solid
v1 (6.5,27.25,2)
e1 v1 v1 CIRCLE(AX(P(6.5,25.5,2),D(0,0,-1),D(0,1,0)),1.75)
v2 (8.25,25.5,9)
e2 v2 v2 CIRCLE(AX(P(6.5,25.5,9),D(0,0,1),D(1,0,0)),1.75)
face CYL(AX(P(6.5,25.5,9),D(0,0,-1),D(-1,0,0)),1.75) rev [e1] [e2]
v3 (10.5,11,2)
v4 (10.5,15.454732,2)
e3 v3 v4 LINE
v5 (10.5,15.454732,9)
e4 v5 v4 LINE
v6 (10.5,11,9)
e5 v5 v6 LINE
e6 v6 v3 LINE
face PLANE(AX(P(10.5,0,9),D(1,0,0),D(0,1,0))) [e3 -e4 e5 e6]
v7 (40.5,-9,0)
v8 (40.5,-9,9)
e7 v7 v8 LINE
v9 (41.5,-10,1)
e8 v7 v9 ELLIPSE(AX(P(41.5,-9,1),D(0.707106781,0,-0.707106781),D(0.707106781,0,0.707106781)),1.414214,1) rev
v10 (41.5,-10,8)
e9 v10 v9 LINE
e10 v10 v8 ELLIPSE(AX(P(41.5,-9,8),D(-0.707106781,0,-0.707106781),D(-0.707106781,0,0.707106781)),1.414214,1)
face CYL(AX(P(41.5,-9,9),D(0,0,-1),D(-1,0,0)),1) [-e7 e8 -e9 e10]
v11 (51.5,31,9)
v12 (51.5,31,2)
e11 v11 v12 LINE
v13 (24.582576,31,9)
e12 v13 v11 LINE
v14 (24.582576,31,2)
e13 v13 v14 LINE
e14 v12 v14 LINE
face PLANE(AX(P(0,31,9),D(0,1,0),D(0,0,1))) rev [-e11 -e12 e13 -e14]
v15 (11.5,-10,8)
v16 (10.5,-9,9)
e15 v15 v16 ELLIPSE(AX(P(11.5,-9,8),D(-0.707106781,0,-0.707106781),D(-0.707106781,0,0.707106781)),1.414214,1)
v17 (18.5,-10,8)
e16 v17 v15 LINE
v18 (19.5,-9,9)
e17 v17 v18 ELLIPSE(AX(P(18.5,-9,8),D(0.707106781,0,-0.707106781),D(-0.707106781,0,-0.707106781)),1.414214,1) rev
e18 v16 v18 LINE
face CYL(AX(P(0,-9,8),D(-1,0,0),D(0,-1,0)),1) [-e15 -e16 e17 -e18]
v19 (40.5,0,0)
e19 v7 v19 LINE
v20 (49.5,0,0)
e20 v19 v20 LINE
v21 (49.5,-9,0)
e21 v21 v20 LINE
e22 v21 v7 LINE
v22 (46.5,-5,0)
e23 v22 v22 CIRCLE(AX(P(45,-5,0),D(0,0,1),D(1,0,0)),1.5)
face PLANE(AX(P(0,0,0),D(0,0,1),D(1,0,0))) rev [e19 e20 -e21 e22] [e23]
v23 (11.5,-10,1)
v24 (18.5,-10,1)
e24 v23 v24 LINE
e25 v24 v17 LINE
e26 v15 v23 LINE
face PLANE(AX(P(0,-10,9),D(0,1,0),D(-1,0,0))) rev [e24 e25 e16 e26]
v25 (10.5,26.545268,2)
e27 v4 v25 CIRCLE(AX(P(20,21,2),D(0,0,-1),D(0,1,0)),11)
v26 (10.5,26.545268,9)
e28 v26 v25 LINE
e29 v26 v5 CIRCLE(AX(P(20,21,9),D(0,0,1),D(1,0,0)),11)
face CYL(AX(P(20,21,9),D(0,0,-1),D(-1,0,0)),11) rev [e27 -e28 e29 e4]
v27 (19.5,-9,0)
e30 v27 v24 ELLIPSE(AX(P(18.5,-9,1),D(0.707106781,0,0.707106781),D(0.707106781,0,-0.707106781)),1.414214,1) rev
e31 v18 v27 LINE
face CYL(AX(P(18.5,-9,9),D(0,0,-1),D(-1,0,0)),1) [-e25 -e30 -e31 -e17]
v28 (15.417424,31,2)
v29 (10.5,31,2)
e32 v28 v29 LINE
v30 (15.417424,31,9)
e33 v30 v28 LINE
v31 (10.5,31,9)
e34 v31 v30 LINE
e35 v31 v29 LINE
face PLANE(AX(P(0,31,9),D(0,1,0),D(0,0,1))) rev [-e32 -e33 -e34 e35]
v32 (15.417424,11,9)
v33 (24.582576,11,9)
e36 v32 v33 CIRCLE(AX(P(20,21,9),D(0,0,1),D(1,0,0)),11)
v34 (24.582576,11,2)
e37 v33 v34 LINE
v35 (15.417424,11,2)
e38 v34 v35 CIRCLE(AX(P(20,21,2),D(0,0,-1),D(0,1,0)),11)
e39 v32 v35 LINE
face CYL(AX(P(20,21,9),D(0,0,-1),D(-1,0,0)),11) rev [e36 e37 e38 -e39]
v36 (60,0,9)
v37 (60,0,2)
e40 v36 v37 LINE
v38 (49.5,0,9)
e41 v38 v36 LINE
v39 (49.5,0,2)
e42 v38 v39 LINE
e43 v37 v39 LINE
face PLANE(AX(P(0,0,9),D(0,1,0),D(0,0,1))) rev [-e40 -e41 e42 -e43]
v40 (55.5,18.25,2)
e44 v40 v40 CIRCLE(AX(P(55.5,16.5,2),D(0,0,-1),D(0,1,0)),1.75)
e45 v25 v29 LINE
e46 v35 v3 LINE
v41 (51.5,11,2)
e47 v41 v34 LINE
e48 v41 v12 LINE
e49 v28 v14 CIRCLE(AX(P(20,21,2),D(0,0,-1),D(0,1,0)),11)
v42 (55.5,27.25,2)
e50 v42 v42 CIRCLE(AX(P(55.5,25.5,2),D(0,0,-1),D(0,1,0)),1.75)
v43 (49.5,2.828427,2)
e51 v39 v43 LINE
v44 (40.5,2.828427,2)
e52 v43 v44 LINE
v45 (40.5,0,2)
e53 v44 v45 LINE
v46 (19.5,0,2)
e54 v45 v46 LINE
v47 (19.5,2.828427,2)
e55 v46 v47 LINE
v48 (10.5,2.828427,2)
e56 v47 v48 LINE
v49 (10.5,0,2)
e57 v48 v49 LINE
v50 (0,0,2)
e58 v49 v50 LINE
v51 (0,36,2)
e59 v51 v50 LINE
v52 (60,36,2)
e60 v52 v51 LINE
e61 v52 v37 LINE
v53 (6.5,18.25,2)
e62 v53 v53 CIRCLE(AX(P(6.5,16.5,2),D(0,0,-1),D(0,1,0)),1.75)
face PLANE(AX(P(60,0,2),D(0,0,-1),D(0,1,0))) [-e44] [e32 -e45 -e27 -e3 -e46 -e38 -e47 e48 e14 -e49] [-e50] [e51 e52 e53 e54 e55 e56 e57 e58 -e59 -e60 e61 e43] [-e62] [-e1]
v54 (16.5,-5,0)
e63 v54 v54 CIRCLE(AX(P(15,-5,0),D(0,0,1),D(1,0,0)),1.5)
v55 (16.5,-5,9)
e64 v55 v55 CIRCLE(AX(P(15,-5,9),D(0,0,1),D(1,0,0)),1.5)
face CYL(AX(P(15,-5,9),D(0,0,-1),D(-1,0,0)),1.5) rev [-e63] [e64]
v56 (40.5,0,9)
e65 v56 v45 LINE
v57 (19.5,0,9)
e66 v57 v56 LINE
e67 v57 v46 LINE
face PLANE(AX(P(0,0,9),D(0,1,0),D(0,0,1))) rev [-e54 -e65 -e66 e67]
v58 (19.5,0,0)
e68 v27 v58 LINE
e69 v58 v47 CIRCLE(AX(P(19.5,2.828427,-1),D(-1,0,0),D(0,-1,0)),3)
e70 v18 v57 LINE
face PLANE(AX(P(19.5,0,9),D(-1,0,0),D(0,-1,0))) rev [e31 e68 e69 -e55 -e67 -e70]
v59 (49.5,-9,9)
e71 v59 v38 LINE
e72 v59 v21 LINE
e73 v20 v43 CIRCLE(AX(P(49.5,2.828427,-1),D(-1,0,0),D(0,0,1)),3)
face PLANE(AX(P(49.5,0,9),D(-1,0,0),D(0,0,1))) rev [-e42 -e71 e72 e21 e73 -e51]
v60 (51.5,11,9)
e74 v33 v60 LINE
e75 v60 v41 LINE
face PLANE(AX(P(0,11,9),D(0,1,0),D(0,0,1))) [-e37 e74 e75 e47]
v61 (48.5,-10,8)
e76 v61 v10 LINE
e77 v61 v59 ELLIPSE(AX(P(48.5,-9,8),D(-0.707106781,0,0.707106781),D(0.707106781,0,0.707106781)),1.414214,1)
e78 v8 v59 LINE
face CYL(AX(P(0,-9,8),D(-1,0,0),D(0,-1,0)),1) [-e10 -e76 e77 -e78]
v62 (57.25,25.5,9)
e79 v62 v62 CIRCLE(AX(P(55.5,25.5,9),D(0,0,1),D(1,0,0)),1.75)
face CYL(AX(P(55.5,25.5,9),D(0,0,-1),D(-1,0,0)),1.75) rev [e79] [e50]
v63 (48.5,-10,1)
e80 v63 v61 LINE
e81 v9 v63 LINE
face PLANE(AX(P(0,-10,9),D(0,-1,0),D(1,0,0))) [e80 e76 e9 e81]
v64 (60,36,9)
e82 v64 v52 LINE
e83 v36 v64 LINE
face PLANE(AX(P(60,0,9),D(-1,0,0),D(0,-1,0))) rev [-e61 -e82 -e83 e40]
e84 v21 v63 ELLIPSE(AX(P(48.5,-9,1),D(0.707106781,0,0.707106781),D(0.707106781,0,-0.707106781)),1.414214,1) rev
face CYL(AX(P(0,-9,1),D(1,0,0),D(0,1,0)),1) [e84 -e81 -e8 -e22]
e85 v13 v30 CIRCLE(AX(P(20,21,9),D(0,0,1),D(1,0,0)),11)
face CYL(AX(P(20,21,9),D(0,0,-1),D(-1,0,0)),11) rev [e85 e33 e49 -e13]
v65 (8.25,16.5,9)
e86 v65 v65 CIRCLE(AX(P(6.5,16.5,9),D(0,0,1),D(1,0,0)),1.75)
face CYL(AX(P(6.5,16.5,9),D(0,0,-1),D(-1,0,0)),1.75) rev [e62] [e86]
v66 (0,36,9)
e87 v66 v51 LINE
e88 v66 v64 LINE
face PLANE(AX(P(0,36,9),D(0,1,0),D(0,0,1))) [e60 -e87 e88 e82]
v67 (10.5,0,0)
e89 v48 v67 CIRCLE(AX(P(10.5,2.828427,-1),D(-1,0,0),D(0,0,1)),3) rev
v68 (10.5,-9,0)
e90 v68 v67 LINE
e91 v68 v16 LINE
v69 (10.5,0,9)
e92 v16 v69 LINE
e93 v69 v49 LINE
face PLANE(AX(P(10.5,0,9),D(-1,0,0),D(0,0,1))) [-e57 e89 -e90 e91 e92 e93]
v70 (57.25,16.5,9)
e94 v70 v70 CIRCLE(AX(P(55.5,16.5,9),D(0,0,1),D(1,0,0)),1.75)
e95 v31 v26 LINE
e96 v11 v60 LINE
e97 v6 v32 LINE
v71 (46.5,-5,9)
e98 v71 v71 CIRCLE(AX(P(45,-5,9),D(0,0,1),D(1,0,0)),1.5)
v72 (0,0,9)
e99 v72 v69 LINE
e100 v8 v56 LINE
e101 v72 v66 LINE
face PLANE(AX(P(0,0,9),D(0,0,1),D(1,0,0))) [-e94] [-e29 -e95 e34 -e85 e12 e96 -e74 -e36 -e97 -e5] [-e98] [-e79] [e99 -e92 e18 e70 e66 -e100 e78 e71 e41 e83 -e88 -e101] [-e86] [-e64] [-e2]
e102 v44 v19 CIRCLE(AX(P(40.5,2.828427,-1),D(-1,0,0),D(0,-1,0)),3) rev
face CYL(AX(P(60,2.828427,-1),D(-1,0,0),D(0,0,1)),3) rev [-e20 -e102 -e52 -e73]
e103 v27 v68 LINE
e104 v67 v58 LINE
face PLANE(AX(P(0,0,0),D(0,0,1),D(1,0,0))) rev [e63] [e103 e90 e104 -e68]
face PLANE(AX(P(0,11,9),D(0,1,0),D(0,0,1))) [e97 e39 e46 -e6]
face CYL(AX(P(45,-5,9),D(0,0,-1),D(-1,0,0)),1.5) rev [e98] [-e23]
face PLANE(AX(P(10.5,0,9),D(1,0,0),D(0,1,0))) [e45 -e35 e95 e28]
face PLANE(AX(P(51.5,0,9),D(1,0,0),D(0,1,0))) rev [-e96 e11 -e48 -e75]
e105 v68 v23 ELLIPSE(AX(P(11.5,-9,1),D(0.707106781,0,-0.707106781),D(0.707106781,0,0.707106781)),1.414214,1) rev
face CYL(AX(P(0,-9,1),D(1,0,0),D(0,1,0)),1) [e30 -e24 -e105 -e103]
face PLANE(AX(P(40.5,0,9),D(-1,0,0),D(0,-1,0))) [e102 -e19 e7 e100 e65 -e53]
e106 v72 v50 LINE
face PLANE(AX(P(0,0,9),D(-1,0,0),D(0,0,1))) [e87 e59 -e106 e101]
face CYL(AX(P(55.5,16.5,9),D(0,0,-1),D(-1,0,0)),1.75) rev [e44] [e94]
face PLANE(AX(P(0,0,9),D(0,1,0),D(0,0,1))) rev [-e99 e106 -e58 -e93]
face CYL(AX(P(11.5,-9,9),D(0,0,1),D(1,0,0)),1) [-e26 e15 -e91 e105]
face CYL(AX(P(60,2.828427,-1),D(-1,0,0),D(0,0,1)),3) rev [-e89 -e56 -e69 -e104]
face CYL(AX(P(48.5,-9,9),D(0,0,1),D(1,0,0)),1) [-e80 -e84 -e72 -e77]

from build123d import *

# Parameters (mm, degrees)
CROQUIS1_R              = 1.75
CROQUIS1_R_2            = 1.5
SALIENTE_EXTRUIR1_DEPTH = 9
REDONDEO1_R             = 1
CROQUIS2_W              = 2
CROQUIS2_H              = 36
CORTAR_EXTRUIR1_DEPTH   = 71.547856098
REDONDEO2_R             = 3


with BuildPart() as part:
    # Croquis1 → Saliente-Extruir1 (new body)
    with BuildSketch(Plane.XY):
        Polygon((0, 36), (0, 0), (10.5, 0), (10.5, -10), (19.5, -10), (19.5, 0), (40.5, 0), (40.5, -10), (49.5, -10), (49.5, 0), (60, 0), (60, 36), align=None)
        with Locations((6.5, 16.5)):
            Circle(CROQUIS1_R, mode=Mode.SUBTRACT)
        with Locations((6.5, 25.5)):
            Circle(CROQUIS1_R, mode=Mode.SUBTRACT)
        with BuildLine():
            Line((10.5, 26.545268253), (10.5, 31))
            Line((10.5, 31), (15.417424305, 31))
            ThreePointArc((15.417424305, 31), (20, 32), (24.582575695, 31))
            Line((24.582575695, 31), (51.5, 31))
            Line((51.5, 31), (51.5, 11))
            Line((51.5, 11), (24.582575695, 11))
            ThreePointArc((24.582575695, 11), (20, 10), (15.417424305, 11))
            Line((15.417424305, 11), (10.5, 11))
            Line((10.5, 11), (10.5, 15.454731747))
            ThreePointArc((10.5, 15.454731747), (9, 21), (10.5, 26.545268253))
        make_face(mode=Mode.SUBTRACT)
        with Locations((55.5, 16.5)):
            Circle(CROQUIS1_R, mode=Mode.SUBTRACT)
        with Locations((55.5, 25.5)):
            Circle(CROQUIS1_R, mode=Mode.SUBTRACT)
        with Locations((15, -5)):
            Circle(CROQUIS1_R_2, mode=Mode.SUBTRACT)
        with Locations((45, -5)):
            Circle(CROQUIS1_R_2, mode=Mode.SUBTRACT)
    extrude(amount=SALIENTE_EXTRUIR1_DEPTH)

    # Redondeo1
    redondeo1_edges = [part.edges().sort_by_distance(p)[0] for p in [
        (45, -10, 0),
        (15, -10, 0),
        (49.5, -10, 4.5),
        (40.5, -10, 4.5),
        (19.5, -10, 4.5),
        (10.5, -10, 4.5),
        (15, -10, 9),
        (45, -10, 9),
    ]]
    fillet(redondeo1_edges, radius=REDONDEO1_R)

    # Croquis2 → Cortar-Extruir1 (cut, through all)
    with BuildSketch(Plane.ZY):
        with Locations((1, 18)):
            Rectangle(CROQUIS2_W, CROQUIS2_H)
    extrude(amount=-CORTAR_EXTRUIR1_DEPTH, mode=Mode.SUBTRACT)

    # Redondeo2
    # the kernel refuses this fillet: 3 mm, written as the material it adds along each edge
    with BuildSketch(Plane(origin=(10.5, 0, 2), x_dir=(0, 0, -1), z_dir=(1, 0, 0))) as redondeo2_piece_1:
        with BuildLine():
            CenterArc((3, 2.828427125), REDONDEO2_R, 180, 70.528779366)
            Line((0, 2.828427125), (0, 0))
            Line((0, 0), (2, 0))
        make_face()
    extrude(amount=9)
    with BuildSketch(Plane(origin=(40.5, 0, 2), x_dir=(0, 1, 0), z_dir=(1, 0, 0))) as redondeo2_piece_2:
        with BuildLine():
            CenterArc((2.828427125, -3), REDONDEO2_R, 90, 70.528779366)
            Line((0, -2), (0, 0))
            Line((0, 0), (2.828427125, 0))
        make_face()
    extrude(amount=9)


solid = part.part
